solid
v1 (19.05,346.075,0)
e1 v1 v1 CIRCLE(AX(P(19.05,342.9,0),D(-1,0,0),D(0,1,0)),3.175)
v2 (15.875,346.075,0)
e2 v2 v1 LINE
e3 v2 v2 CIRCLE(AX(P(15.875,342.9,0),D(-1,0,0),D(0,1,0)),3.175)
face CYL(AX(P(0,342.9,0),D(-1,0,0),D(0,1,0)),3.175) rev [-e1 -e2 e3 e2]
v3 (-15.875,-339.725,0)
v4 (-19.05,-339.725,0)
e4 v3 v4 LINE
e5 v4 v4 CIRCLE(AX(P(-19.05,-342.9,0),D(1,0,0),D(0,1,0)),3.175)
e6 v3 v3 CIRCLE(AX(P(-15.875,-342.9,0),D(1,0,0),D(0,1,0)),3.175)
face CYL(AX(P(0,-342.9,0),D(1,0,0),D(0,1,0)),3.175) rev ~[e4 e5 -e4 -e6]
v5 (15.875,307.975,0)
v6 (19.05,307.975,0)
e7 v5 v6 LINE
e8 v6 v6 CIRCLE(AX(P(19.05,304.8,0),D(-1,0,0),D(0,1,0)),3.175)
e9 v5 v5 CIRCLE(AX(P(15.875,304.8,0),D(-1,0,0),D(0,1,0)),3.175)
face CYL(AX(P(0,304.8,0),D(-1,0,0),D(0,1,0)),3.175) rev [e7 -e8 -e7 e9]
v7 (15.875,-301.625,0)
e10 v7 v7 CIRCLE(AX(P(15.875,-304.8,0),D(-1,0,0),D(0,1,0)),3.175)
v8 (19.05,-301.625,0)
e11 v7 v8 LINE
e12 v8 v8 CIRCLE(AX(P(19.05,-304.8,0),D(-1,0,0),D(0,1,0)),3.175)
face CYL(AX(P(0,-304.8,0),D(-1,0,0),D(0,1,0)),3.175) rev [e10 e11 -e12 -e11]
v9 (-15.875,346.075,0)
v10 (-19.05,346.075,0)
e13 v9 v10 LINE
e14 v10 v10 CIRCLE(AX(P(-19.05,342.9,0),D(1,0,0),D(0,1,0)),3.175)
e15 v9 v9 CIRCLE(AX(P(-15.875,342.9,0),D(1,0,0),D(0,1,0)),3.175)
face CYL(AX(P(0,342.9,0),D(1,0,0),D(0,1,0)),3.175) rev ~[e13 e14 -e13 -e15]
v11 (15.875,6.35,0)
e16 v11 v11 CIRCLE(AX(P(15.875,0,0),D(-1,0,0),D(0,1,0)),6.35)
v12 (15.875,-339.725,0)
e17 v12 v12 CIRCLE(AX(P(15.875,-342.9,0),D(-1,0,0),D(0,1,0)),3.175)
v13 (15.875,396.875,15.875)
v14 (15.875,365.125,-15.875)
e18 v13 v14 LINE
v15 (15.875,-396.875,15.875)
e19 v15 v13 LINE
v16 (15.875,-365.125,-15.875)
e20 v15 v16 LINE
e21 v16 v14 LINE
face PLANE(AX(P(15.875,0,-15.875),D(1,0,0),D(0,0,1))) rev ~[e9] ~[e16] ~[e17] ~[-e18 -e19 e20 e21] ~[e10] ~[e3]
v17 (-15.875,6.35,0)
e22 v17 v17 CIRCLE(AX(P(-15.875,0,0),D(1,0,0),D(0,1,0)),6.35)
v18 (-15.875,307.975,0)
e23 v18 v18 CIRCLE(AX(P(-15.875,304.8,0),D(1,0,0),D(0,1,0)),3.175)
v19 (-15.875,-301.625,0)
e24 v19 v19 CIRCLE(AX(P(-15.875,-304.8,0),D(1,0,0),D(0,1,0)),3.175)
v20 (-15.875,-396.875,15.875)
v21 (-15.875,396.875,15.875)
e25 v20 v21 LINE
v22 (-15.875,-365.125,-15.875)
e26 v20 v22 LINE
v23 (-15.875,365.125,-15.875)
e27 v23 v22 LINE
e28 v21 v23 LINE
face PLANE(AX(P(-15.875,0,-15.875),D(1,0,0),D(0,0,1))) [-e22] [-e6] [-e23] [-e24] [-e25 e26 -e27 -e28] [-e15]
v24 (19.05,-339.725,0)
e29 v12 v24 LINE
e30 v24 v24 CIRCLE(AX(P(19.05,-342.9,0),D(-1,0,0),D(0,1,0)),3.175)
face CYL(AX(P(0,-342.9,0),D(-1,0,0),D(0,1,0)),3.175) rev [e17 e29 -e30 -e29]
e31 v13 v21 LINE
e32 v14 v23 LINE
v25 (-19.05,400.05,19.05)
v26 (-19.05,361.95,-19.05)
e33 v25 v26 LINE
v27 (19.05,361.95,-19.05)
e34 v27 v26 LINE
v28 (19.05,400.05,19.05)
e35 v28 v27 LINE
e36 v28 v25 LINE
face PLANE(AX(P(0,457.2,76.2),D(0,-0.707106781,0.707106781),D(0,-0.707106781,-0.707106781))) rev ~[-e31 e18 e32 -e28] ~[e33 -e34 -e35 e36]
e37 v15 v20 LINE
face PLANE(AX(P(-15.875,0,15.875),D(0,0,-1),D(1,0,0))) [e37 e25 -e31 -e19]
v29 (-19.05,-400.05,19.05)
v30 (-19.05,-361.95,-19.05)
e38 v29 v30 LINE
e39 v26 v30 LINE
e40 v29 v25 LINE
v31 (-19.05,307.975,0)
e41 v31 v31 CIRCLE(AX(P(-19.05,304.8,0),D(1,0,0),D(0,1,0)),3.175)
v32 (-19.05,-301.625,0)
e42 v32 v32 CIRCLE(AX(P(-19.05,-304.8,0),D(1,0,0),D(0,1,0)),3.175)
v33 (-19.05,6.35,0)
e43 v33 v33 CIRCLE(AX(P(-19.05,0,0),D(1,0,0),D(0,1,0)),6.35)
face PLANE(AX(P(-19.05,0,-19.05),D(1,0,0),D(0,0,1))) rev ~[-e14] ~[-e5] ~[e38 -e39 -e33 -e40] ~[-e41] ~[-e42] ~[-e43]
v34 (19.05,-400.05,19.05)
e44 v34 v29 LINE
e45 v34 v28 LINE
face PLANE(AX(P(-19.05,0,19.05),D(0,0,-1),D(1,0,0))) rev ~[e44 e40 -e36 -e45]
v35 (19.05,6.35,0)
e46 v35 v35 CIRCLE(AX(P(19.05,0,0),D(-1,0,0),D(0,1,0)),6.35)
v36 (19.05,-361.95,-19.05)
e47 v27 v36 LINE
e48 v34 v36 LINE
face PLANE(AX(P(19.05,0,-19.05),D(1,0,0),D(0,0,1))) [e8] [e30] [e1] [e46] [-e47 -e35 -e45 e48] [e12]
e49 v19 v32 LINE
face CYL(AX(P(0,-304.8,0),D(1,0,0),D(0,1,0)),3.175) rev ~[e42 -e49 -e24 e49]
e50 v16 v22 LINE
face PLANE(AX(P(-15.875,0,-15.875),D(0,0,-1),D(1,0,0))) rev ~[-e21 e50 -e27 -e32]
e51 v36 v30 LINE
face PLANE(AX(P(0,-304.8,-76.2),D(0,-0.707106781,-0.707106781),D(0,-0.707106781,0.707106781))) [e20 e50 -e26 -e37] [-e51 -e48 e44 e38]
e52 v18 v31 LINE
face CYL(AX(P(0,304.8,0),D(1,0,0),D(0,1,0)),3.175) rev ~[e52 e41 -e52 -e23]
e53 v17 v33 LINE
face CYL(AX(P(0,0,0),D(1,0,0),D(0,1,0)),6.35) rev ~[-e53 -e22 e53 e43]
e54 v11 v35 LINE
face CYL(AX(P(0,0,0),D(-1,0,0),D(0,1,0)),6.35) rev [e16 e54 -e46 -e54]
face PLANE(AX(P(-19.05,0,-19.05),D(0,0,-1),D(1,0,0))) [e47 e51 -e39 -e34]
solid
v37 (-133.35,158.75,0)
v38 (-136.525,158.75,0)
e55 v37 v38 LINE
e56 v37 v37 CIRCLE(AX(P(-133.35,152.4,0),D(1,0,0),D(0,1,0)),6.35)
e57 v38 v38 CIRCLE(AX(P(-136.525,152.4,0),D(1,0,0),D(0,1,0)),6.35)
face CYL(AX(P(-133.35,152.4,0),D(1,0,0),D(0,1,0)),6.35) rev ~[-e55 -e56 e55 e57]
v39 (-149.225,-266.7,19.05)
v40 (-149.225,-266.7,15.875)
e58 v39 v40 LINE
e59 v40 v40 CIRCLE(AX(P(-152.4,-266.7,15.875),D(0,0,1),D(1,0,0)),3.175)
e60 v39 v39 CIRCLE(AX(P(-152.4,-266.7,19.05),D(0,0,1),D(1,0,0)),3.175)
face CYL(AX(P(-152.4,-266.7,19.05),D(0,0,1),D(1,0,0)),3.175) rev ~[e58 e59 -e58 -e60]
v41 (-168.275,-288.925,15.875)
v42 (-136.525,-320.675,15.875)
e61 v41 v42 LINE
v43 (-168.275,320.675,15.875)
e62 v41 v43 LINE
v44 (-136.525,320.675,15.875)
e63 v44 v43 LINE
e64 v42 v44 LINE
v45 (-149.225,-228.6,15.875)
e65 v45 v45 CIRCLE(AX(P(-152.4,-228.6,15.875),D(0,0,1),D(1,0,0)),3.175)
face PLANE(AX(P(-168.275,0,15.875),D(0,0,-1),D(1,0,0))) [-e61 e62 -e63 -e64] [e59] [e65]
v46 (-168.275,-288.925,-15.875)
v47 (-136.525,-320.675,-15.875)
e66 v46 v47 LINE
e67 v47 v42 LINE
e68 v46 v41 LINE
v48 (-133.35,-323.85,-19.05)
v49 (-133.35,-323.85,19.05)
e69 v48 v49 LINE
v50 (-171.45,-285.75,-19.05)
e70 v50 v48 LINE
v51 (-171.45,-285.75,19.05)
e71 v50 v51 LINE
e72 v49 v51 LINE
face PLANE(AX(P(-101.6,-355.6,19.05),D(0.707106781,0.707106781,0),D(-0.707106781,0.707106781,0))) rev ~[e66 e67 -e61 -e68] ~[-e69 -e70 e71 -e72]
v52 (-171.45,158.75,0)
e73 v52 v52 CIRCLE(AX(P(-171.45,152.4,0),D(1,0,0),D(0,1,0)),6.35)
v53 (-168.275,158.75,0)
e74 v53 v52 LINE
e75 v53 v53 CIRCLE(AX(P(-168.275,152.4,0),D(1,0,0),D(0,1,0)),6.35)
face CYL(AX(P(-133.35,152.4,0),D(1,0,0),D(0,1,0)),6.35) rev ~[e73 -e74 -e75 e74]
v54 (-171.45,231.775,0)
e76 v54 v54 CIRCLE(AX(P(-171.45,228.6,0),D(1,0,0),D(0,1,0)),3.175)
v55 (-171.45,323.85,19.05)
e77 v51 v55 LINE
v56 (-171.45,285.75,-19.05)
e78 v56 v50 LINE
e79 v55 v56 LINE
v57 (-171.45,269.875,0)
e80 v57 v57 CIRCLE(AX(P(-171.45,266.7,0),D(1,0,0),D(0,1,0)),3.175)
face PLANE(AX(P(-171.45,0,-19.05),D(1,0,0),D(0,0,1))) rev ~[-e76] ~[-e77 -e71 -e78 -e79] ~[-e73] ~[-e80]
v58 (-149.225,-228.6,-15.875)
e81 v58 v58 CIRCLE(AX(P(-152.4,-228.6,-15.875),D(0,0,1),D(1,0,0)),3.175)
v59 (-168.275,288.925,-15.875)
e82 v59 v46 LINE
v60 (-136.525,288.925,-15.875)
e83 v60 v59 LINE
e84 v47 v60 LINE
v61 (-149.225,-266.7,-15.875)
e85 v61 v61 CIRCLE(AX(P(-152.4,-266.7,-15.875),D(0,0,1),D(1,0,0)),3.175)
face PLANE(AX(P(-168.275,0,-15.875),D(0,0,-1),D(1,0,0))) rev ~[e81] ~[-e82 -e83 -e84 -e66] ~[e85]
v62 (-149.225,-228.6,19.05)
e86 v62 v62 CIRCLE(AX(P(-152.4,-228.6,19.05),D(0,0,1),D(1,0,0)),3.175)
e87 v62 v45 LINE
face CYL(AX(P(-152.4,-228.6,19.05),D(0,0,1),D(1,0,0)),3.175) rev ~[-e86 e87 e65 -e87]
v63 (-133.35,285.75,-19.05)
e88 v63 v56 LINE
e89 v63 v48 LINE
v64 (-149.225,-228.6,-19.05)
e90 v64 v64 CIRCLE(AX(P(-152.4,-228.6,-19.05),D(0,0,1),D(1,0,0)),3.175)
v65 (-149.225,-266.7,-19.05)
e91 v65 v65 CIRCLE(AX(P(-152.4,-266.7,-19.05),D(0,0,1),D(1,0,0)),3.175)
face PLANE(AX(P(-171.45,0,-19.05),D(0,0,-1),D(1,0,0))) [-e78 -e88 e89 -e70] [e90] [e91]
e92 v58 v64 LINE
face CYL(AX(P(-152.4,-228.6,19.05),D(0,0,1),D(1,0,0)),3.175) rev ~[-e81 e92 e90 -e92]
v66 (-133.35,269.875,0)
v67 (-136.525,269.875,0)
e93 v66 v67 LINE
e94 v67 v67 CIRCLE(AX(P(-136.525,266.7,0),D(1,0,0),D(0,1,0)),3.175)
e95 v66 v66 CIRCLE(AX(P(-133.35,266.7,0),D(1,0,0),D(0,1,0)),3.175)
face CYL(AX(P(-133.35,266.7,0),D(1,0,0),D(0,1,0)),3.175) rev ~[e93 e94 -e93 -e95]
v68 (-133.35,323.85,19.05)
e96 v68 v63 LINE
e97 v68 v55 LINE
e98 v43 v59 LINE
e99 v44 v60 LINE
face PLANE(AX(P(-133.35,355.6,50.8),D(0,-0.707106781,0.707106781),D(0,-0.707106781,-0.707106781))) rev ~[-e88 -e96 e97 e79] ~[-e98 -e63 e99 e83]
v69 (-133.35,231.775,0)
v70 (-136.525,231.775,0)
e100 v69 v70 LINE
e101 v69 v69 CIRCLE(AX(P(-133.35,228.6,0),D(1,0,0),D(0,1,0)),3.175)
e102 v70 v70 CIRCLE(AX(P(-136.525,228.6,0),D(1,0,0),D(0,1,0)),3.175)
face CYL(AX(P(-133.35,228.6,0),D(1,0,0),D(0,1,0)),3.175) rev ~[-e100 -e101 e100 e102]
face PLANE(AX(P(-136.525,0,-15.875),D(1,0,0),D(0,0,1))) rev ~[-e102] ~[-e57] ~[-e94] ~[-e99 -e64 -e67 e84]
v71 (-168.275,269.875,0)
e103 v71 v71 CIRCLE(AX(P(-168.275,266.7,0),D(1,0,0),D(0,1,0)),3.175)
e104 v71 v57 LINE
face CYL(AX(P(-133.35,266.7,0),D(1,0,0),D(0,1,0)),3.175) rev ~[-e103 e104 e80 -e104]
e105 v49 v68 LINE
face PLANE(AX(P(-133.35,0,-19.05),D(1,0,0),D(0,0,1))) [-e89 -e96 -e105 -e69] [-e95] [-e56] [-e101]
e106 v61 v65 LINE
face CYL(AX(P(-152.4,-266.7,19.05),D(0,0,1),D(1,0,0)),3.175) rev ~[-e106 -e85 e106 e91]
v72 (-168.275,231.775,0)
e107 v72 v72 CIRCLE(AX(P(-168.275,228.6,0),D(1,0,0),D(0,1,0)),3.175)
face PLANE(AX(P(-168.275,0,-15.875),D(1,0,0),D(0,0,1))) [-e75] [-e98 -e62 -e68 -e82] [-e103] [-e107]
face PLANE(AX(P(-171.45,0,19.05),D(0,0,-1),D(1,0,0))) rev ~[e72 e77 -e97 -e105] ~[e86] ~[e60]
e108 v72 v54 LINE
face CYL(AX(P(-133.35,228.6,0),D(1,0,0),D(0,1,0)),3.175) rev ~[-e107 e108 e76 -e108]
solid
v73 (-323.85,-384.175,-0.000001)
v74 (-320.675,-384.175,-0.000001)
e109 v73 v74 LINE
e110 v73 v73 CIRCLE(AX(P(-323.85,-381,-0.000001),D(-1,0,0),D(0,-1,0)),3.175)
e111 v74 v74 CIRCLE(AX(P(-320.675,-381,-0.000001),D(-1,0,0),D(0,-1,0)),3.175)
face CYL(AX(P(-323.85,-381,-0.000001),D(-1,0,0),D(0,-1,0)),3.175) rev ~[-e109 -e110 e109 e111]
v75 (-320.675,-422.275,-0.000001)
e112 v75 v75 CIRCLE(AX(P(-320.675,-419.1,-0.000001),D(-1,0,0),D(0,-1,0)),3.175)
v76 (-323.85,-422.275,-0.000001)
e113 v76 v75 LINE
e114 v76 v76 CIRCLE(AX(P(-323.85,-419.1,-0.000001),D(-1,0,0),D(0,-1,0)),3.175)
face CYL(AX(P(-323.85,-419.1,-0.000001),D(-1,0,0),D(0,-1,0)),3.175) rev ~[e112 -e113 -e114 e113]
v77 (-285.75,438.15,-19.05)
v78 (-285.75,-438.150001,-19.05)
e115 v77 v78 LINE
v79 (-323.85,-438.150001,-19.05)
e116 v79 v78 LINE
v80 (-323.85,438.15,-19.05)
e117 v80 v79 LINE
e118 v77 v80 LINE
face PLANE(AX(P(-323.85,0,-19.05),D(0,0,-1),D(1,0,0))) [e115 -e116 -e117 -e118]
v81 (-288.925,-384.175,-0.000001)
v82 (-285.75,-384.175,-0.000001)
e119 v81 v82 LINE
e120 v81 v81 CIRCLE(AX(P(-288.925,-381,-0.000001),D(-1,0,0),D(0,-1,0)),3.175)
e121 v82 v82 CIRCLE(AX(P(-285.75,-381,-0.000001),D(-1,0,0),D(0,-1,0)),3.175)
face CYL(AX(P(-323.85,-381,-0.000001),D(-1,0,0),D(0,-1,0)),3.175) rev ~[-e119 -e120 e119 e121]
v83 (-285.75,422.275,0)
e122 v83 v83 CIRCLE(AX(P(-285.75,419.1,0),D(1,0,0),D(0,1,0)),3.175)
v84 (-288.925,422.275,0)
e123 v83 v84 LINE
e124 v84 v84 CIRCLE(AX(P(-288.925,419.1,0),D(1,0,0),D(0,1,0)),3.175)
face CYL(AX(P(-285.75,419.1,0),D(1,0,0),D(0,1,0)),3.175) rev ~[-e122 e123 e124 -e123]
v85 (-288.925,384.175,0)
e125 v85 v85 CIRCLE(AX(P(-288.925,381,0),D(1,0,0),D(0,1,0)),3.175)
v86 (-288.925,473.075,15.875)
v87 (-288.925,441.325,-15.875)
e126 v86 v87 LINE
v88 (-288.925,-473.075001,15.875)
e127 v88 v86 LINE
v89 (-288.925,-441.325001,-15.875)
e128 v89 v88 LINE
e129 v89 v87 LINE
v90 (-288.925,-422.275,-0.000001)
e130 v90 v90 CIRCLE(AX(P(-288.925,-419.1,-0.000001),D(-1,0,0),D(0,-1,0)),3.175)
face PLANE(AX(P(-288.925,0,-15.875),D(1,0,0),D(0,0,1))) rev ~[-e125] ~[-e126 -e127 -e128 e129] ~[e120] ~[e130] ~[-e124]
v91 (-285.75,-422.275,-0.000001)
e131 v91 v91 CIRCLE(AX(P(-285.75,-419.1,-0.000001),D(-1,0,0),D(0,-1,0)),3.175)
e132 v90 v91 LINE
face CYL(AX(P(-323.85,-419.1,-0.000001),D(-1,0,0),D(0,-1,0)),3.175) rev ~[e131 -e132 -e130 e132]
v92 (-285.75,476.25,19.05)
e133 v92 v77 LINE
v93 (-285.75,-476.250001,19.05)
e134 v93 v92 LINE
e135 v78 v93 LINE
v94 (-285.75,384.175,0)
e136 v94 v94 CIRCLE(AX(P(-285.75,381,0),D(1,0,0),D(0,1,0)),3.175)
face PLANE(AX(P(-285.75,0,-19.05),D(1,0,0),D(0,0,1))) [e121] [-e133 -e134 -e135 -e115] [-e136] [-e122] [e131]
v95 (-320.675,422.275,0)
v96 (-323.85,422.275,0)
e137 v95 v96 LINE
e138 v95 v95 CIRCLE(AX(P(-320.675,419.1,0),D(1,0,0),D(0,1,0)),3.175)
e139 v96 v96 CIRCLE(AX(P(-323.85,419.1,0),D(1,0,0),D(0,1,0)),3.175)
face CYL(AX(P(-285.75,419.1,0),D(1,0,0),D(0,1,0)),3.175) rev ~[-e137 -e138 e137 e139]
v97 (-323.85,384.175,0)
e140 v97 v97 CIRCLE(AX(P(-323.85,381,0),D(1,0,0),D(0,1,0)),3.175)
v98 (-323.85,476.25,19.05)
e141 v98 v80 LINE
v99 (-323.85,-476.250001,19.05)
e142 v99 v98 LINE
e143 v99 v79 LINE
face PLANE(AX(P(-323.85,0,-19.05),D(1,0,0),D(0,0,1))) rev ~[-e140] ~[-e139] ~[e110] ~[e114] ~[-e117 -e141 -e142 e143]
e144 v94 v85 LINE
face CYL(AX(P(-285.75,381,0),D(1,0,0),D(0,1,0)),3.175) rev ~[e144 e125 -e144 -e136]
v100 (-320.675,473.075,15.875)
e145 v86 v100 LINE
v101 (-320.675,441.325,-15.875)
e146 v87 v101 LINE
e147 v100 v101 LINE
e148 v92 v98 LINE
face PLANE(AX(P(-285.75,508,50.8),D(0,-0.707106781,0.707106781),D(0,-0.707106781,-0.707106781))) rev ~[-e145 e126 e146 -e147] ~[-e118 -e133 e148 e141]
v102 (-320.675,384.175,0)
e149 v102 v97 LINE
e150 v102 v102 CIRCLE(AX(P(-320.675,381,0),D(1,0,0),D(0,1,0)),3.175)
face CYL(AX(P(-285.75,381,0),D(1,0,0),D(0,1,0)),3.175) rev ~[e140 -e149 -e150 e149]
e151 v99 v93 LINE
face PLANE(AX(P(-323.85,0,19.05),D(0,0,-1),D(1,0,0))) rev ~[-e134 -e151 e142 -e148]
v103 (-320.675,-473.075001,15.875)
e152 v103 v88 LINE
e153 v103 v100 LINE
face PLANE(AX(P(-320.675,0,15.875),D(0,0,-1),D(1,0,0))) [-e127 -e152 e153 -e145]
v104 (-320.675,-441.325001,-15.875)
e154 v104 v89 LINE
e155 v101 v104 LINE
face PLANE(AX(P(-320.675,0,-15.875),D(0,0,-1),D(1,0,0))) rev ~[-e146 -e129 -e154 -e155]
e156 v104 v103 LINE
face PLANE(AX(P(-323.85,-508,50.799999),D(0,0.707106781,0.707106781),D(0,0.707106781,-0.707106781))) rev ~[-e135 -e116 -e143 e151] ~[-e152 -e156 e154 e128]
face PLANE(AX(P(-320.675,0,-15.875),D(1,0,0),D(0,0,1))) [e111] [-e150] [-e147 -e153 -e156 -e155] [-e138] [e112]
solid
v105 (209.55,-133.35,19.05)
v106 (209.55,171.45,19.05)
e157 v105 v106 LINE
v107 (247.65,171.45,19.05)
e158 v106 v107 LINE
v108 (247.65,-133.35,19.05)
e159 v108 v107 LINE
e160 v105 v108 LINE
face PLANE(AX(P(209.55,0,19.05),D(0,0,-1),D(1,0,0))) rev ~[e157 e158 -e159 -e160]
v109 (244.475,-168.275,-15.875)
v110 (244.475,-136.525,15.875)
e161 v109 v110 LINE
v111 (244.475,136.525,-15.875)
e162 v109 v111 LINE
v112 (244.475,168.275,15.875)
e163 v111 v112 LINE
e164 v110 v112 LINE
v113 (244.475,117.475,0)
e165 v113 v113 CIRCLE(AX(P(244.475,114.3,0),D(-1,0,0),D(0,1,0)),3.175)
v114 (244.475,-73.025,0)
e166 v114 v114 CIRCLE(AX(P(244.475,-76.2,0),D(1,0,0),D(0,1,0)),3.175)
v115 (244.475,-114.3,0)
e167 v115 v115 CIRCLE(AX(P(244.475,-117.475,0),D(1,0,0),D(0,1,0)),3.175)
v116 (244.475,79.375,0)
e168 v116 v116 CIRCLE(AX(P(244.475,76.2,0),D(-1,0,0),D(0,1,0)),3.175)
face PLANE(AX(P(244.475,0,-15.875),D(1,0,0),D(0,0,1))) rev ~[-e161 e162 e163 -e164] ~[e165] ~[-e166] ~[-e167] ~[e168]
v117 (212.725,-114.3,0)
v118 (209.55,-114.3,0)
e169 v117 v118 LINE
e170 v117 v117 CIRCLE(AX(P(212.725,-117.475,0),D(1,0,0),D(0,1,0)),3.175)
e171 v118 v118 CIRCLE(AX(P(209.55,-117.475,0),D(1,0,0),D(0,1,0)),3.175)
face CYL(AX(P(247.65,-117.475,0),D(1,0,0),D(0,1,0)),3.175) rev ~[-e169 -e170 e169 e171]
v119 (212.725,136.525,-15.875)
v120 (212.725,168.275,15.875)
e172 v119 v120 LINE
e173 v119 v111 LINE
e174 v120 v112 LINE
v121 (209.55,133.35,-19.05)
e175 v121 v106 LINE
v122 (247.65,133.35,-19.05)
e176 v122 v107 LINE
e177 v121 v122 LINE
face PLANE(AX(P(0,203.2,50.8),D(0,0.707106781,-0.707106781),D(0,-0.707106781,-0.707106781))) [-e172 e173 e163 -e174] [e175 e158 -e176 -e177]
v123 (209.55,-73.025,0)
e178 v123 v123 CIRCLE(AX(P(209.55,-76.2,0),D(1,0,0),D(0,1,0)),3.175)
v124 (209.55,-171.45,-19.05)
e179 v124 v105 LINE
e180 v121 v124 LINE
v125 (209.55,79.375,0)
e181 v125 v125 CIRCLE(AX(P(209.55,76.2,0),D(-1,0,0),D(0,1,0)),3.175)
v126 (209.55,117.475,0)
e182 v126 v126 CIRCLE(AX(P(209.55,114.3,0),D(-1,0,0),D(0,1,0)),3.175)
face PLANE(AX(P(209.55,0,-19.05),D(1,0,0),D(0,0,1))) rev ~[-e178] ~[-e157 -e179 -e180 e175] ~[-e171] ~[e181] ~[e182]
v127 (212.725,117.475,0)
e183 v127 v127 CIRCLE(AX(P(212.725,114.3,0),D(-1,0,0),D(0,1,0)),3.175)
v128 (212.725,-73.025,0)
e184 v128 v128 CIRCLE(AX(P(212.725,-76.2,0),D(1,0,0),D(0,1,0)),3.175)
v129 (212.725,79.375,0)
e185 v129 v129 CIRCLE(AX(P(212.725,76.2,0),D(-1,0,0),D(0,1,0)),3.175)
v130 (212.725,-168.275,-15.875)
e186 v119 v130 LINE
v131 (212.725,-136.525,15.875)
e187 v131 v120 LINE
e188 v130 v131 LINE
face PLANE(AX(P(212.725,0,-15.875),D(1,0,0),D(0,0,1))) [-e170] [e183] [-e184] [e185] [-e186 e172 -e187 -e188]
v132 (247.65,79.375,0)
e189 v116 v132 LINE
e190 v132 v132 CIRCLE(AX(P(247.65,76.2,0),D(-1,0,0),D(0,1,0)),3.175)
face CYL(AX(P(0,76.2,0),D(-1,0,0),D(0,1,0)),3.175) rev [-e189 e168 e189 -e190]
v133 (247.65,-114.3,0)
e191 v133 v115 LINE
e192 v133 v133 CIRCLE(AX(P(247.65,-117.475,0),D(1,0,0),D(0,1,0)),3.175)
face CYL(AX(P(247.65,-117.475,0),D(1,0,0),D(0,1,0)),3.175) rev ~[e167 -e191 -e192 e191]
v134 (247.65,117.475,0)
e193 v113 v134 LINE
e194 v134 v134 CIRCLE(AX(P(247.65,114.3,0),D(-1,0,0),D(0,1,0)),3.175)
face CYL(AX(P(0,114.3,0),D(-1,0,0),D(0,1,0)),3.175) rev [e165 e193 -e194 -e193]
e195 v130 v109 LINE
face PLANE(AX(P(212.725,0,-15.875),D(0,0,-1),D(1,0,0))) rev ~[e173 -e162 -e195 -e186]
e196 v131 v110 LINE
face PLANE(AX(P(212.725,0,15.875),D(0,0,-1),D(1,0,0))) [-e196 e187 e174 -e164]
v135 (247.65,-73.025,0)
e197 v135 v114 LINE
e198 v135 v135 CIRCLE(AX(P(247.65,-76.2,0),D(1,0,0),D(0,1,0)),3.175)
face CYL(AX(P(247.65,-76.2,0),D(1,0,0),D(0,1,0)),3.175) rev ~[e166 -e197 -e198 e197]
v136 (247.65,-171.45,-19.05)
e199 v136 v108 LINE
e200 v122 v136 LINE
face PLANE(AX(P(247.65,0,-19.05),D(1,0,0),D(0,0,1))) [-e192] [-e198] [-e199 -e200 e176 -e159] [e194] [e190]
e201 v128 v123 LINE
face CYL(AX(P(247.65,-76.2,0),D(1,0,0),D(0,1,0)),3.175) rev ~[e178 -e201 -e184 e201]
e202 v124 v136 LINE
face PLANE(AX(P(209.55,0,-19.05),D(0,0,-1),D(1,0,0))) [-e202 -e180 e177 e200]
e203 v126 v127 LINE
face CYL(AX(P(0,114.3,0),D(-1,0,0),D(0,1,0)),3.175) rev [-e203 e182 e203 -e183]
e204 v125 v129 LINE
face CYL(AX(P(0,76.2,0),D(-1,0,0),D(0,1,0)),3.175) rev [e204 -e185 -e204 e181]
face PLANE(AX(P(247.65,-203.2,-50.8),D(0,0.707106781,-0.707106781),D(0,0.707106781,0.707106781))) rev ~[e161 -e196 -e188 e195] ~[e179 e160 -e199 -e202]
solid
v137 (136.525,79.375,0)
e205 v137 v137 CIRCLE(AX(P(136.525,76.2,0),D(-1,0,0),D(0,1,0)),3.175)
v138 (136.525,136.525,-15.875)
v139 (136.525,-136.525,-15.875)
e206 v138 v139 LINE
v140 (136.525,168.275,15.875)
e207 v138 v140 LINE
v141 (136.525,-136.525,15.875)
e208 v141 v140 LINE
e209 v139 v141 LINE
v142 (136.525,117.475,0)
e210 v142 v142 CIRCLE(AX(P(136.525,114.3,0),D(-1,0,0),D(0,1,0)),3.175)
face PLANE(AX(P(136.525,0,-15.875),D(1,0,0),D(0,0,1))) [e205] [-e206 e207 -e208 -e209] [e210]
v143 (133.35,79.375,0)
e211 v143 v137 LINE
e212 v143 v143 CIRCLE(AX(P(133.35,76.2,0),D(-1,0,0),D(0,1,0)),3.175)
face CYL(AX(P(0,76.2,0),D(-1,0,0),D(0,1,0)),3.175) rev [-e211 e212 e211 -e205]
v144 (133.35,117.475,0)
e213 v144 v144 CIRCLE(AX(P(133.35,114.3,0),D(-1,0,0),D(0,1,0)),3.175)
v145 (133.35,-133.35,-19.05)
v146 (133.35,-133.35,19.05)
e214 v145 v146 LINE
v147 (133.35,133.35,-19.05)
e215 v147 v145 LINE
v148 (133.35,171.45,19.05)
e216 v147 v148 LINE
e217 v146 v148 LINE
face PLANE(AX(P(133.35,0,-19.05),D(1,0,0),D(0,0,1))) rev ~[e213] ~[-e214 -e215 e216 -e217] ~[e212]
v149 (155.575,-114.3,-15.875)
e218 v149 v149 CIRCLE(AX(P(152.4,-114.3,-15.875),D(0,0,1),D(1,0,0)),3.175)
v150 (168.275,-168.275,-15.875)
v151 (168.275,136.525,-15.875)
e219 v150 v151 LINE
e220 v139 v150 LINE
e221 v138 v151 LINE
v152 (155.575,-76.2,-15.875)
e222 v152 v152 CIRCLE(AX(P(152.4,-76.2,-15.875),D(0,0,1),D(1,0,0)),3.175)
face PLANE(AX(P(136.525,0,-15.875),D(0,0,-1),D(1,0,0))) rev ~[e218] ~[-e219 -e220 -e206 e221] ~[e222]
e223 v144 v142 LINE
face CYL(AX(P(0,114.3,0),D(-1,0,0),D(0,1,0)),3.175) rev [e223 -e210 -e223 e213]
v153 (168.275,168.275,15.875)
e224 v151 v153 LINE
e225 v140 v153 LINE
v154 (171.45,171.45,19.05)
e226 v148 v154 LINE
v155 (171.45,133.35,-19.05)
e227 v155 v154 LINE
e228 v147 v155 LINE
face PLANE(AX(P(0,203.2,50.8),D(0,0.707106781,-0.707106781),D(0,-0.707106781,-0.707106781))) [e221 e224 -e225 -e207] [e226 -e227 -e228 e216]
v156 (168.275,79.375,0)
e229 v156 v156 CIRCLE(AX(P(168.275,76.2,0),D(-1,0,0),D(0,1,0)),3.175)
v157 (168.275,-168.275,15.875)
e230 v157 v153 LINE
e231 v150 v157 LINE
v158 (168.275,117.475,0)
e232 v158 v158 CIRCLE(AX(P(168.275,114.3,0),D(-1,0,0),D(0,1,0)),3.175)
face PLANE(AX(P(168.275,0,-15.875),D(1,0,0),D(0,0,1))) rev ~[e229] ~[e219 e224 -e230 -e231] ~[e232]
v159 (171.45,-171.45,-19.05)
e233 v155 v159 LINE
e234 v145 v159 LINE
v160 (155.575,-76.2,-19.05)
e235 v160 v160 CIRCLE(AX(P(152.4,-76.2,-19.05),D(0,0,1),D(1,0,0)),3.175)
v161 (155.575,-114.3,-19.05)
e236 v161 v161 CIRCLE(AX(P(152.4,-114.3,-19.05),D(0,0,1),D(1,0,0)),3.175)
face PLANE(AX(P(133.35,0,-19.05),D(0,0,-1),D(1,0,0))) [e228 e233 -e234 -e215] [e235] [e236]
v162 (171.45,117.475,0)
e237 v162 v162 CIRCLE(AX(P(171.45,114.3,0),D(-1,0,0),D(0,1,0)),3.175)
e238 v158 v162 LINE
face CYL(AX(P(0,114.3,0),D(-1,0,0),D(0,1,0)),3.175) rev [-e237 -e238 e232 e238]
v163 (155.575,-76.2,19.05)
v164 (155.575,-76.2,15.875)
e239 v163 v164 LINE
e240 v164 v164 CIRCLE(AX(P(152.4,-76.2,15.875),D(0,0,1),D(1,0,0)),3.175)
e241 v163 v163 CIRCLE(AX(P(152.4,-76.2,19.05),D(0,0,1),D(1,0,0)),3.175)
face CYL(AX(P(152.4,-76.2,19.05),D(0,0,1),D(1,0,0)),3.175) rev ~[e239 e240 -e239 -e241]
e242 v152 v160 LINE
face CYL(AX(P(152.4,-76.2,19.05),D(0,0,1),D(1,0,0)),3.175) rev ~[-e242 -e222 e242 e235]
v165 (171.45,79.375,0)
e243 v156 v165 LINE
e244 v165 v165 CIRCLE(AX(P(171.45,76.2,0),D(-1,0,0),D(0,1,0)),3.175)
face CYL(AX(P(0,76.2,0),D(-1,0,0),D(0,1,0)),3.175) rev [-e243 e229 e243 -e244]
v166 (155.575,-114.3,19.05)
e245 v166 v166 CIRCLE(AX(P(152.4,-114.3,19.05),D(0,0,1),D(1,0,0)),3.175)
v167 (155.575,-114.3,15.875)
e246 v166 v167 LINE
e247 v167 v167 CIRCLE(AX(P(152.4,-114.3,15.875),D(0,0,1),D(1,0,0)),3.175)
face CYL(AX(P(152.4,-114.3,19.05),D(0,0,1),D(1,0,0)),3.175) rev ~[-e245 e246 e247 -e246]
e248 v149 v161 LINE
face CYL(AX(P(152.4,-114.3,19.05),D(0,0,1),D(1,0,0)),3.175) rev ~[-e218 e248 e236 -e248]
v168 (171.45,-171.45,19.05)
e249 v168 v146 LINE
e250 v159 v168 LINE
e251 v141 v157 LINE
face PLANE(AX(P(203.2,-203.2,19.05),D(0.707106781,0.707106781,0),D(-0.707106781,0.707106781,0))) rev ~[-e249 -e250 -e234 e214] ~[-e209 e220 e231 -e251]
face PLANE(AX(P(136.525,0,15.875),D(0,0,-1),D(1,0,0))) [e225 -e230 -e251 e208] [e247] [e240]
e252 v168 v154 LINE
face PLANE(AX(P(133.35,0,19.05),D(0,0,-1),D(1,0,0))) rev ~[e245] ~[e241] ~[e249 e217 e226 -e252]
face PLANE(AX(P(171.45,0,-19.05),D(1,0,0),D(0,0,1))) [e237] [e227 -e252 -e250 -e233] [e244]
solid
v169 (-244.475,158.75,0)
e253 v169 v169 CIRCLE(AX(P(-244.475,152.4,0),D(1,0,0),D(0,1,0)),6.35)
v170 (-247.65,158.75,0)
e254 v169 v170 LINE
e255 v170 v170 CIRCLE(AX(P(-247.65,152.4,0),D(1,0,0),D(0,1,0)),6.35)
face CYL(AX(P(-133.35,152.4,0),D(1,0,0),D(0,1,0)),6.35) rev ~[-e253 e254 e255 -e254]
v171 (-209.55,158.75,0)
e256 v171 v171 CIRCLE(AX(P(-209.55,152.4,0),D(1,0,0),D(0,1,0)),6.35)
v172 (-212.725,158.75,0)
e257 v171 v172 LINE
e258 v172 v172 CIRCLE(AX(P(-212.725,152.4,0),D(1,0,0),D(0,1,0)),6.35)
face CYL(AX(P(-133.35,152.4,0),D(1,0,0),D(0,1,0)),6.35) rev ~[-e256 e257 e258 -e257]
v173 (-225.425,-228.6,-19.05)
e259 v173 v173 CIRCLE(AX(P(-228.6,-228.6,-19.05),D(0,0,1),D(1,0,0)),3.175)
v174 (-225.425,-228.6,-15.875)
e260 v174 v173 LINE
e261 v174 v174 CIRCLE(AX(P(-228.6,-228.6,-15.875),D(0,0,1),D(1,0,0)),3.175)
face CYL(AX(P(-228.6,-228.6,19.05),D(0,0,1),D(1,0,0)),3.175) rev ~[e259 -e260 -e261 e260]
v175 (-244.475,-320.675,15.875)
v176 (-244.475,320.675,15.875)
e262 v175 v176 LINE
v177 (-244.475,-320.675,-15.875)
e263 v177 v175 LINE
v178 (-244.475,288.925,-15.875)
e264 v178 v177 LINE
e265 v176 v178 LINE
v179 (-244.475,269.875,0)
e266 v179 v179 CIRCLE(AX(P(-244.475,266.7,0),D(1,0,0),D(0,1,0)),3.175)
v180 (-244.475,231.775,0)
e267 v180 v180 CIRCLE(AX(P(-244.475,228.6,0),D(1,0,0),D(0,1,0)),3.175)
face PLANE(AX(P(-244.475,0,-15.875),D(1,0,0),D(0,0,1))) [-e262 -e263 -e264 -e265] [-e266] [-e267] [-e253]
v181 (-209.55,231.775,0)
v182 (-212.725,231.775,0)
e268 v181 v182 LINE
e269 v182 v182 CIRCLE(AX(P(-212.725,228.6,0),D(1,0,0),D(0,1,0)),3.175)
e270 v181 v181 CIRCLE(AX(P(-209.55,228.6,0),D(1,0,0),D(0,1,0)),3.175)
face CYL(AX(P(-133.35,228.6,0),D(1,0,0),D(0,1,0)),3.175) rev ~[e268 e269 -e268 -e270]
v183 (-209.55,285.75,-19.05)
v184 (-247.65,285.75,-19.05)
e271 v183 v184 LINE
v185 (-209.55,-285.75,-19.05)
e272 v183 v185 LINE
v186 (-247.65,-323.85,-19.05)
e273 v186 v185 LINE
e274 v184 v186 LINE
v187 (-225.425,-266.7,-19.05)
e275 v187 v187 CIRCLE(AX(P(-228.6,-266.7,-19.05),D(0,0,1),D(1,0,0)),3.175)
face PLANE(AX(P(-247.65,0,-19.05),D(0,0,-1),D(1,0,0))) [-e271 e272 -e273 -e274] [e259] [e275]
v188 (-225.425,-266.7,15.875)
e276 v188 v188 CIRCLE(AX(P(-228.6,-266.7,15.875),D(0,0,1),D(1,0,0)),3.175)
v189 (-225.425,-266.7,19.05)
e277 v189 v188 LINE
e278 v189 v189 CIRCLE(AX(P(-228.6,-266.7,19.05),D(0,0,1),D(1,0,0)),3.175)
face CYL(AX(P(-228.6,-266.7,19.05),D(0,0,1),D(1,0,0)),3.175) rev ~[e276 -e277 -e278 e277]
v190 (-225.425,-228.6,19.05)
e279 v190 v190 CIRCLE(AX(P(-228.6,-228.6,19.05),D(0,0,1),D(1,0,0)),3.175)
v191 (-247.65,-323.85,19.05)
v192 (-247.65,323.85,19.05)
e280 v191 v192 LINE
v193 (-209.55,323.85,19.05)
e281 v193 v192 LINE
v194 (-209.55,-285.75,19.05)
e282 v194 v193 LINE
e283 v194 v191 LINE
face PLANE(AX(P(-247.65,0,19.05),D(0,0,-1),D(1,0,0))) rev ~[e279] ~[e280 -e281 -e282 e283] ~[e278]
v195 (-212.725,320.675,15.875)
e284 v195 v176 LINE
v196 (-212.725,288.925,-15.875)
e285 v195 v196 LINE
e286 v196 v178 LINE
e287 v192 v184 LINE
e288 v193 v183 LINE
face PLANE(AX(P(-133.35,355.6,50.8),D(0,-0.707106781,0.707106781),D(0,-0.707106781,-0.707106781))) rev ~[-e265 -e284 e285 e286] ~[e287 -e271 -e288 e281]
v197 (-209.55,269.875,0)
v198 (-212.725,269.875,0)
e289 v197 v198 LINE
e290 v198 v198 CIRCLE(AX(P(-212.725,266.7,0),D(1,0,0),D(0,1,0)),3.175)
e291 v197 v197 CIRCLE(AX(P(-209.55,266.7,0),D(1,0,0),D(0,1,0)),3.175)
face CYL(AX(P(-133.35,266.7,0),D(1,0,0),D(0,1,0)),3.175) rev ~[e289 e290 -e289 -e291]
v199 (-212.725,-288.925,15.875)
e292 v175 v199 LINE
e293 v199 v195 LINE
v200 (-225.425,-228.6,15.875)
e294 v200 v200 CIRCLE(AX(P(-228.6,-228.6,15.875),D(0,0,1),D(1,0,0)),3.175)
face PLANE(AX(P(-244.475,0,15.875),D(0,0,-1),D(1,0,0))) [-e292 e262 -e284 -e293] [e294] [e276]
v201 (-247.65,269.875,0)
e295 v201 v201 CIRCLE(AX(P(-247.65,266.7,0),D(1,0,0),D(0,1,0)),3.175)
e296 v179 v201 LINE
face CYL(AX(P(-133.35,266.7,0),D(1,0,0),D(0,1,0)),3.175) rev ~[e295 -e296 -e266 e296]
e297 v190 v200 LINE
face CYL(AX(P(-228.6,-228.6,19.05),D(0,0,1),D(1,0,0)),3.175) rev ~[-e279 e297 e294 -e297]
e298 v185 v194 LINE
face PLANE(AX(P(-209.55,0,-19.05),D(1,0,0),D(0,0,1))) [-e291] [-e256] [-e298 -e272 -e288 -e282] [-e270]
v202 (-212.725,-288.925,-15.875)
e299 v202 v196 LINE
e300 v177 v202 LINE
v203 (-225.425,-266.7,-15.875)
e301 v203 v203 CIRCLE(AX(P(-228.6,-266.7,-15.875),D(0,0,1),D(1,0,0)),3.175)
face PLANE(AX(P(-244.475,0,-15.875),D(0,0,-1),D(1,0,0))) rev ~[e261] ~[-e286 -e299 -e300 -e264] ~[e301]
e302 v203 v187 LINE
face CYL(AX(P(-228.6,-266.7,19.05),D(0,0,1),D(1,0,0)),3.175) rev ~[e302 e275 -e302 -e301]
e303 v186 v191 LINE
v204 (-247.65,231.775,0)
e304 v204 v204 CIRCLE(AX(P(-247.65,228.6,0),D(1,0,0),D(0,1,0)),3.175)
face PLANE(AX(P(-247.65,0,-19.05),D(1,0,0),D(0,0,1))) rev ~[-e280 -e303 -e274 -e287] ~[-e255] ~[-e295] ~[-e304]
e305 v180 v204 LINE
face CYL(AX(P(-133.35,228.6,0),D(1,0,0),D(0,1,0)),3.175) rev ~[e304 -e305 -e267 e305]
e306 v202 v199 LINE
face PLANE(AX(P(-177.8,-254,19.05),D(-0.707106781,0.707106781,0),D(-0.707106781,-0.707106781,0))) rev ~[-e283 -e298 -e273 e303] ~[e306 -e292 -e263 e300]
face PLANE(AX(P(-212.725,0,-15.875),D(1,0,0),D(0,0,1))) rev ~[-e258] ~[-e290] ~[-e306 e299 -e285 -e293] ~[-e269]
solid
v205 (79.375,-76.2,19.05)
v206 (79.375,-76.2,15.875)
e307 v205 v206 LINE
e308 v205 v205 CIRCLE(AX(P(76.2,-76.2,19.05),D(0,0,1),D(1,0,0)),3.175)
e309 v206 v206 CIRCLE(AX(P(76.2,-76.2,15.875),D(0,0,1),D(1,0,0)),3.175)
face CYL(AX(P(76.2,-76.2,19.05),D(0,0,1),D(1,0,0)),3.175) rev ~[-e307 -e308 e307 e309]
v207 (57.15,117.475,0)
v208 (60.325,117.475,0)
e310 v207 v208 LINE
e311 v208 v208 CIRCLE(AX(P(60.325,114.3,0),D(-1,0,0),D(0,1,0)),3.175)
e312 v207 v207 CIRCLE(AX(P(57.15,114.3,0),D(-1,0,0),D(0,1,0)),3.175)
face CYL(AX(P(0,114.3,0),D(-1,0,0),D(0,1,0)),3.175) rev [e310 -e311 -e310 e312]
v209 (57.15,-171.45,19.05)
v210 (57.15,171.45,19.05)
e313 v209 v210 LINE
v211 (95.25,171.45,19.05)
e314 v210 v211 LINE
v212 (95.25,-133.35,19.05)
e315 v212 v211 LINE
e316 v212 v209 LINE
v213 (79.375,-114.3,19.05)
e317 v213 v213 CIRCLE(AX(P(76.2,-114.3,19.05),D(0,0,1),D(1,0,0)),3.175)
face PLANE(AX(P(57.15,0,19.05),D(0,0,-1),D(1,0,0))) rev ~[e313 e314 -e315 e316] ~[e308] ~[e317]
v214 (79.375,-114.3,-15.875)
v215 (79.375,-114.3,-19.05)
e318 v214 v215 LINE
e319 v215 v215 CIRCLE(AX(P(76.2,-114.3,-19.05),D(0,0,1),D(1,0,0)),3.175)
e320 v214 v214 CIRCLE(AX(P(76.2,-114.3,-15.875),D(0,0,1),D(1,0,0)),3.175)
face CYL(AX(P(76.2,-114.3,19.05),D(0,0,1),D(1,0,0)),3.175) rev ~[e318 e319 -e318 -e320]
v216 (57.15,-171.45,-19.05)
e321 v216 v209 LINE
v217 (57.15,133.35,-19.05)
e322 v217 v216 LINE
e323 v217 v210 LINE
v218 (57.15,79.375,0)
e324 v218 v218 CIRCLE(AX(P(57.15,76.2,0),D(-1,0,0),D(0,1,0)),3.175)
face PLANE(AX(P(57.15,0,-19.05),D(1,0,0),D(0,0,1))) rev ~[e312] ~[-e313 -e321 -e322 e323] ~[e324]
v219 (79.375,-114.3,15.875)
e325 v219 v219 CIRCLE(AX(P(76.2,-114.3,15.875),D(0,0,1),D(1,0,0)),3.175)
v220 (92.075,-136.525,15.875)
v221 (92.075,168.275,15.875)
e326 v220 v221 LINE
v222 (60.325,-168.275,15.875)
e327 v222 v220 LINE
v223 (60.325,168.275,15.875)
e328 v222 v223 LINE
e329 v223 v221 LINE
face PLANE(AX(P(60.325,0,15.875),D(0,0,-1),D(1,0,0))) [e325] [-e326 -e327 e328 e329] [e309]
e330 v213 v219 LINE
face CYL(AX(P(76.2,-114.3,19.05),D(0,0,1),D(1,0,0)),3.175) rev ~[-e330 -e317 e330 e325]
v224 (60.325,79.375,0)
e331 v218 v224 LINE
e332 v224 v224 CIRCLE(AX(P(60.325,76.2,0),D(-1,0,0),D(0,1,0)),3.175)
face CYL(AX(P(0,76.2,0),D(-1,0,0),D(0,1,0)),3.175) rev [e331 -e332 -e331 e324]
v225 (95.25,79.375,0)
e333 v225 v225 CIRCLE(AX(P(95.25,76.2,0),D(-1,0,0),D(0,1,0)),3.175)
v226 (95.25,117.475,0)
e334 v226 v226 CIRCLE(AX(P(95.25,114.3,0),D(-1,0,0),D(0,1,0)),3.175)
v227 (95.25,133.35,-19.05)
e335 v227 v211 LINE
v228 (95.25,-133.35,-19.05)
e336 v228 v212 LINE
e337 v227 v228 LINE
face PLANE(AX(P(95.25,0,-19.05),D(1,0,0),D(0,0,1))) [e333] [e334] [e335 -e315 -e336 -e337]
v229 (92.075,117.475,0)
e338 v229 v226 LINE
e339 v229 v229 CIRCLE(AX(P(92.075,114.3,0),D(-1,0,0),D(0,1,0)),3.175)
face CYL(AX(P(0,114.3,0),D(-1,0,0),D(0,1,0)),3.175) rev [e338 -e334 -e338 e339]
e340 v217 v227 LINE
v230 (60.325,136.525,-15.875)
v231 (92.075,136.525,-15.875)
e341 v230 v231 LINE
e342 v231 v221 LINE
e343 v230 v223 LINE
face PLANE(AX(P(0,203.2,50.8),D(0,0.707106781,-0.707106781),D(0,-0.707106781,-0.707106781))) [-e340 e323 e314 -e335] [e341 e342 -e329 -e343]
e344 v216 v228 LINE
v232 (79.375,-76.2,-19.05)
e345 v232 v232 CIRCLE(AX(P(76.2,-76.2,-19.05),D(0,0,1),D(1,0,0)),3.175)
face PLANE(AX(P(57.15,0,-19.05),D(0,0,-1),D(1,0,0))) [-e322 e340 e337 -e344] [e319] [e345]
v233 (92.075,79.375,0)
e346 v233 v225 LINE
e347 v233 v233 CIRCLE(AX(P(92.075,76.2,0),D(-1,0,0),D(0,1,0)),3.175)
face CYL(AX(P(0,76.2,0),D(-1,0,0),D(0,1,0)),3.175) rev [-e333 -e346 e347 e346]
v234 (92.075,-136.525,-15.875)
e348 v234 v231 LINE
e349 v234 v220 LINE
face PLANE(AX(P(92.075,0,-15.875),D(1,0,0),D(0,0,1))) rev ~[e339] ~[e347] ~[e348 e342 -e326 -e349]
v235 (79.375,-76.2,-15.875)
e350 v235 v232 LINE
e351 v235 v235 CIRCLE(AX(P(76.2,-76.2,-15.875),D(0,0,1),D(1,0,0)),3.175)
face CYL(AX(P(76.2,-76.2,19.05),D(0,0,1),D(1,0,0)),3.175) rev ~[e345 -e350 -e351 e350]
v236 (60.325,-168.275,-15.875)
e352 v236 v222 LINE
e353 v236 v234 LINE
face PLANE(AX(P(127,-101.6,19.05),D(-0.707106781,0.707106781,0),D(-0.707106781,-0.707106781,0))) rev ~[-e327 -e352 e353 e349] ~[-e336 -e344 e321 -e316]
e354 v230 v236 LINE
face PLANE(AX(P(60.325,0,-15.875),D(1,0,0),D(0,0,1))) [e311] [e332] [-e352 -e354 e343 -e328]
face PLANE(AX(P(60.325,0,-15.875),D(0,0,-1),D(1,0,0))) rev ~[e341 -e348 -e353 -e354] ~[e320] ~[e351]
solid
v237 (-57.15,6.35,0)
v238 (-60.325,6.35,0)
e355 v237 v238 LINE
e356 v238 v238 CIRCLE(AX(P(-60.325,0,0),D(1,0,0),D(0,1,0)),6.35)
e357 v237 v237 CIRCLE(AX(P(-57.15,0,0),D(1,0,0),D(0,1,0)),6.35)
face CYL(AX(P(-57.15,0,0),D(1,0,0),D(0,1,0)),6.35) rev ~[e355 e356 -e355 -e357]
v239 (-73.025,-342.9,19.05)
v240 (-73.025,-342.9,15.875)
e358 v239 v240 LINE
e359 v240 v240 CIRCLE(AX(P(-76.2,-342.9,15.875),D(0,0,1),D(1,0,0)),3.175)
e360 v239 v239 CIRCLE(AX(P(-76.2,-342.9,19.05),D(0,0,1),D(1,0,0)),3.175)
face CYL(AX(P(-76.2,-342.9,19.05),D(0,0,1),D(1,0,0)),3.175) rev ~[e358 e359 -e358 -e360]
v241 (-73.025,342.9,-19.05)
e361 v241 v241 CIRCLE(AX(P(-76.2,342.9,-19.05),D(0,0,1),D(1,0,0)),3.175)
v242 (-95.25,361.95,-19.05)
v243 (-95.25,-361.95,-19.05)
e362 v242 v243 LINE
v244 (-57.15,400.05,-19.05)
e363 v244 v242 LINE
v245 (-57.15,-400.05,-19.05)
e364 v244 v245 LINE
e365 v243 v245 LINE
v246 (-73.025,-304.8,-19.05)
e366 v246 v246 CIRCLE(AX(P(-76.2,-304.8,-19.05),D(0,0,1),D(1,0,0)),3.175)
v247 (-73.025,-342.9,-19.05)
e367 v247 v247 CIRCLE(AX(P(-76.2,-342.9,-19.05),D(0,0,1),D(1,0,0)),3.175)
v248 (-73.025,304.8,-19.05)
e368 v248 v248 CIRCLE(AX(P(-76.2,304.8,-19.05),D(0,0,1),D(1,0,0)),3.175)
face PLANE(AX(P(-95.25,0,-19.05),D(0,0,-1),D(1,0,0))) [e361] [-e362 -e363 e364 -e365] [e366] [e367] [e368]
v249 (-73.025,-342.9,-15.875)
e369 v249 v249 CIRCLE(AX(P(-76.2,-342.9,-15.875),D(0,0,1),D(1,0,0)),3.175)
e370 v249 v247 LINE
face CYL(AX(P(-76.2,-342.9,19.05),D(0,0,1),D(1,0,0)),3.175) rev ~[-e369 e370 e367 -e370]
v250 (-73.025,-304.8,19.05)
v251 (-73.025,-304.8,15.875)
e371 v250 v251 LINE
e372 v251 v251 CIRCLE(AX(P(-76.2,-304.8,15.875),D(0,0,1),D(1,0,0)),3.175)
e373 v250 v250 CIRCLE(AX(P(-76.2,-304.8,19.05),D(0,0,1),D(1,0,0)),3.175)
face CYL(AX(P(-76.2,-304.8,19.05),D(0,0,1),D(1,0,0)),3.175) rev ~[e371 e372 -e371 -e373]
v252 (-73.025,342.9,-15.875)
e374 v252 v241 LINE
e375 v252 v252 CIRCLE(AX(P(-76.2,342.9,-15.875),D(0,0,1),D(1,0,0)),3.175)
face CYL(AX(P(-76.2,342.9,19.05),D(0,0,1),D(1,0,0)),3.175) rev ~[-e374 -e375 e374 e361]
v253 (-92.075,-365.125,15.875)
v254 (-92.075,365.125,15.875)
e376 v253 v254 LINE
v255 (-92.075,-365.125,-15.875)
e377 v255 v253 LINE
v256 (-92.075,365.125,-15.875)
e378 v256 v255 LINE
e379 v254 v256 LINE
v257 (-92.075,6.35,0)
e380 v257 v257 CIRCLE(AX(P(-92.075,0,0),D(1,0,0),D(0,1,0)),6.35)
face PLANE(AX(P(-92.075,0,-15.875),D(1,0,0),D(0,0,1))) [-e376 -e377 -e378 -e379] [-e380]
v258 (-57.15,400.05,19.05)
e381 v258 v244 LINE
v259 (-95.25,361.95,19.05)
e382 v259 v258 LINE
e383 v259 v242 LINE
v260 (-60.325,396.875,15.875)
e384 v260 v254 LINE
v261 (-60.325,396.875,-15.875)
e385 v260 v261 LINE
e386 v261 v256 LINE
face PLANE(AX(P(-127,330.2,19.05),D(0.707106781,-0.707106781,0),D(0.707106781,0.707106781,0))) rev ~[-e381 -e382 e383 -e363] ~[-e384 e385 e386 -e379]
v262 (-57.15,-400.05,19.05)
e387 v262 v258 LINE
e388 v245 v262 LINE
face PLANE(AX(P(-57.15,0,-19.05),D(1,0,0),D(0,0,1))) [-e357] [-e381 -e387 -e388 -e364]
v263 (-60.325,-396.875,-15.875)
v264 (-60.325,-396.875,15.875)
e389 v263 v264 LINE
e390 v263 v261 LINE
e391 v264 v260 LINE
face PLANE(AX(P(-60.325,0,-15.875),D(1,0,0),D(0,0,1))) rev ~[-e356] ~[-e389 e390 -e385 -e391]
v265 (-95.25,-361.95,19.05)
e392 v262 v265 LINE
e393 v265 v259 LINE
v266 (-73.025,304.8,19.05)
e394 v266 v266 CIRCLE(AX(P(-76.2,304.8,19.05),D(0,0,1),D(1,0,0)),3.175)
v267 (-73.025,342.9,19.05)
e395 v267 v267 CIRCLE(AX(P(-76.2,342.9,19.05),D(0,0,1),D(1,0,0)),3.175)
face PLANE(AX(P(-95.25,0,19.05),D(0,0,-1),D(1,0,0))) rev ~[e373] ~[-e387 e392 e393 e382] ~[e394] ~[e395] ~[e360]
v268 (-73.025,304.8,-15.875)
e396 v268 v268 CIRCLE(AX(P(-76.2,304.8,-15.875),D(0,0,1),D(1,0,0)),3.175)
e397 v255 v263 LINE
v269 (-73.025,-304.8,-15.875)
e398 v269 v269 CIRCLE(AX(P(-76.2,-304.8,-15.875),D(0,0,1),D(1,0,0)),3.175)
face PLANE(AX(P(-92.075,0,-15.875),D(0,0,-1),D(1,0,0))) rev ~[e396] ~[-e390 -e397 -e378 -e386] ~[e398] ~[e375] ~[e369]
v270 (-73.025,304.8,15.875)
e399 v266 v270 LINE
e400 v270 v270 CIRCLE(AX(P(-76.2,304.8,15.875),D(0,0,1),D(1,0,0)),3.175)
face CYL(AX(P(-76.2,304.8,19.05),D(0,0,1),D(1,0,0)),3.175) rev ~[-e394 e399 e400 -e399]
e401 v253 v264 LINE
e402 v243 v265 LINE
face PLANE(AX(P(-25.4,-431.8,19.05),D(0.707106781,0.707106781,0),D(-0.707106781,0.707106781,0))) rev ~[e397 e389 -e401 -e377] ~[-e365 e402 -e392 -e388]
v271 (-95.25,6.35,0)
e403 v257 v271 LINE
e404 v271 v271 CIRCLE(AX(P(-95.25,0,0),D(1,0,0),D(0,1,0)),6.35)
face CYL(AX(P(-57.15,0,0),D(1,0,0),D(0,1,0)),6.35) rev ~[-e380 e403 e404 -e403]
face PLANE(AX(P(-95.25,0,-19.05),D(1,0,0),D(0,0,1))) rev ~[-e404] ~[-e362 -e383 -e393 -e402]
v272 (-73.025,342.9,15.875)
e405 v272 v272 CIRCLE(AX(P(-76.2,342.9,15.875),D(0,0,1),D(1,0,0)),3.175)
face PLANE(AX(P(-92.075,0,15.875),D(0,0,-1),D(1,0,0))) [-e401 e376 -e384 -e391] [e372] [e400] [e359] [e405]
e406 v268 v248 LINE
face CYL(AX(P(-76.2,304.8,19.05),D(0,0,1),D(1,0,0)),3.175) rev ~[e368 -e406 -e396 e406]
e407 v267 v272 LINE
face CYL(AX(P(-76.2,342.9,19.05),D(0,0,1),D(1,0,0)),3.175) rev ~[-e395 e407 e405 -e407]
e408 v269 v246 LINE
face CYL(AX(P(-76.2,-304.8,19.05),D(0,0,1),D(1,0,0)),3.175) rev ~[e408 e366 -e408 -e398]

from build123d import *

# Parameters (mm, degrees)
F0_W      = 38.1
F0_H      = 38.1
F0_W_2    = 31.75
F0_H_2    = 31.75
F1_DEPTH  = 457.2
F2_R      = 6.35
F2_R_2    = 3.175
F3_DEPTH  = 76.2
F4_W      = 38.1
F4_H      = 38.1
F4_W_2    = 31.75
F4_H_2    = 31.75
F5_DEPTH  = 457.2
F6_R      = 6.35
F7_DEPTH  = 38.101
F8_R      = 3.175
F9_DEPTH  = 38.101
F10_W     = 38.1
F10_H     = 38.1
F10_W_2   = 31.75
F10_H_2   = 31.75
F11_DEPTH = 228.6
F12_W     = 38.1
F12_H     = 38.1
F12_W_2   = 31.75
F12_H_2   = 31.75
F13_DEPTH = 228.6
F14_R     = 3.175
F15_DEPTH = 247.651
F16_R     = 3.175
F17_DEPTH = 38.101
F18_R     = 3.175
F19_DEPTH = 38.101
F20_R     = 3.175
F21_DEPTH = 342.901
F22_W     = 38.1
F22_H     = 38.1
F22_W_2   = 31.75
F22_H_2   = 31.75
F23_DEPTH = 355.6
F24_DEPTH = 508
F25_R     = 3.175
F25_R_2   = 6.35
F26_DEPTH = 190.501
F27_R     = 3.175
F28_DEPTH = 38.101
F29_R     = 3.175
F30_DEPTH = 38.101
F31_R     = 3.175
F32_DEPTH = 38.101
F33_R     = 3.175
F34_DEPTH = 571.501


with BuildPart() as f1:
    # F0 (on Front) → F1 (new body, symmetric)
    with BuildSketch(Plane.XZ):
        Rectangle(F0_W, F0_H)
        Rectangle(F0_W_2, F0_H_2, mode=Mode.SUBTRACT)
    extrude(amount=F1_DEPTH, both=True)

    # F2 (on Right) → F3 (cut, symmetric)
    with BuildSketch(Plane.YZ):
        Circle(F2_R)
        Polygon((-304.8, -76.2), (-381, 0), (-457.2, 76.2), (-558.8, 76.2), (-558.8, -76.2), align=None)
        with Locations((-304.8, 0)):
            Circle(F2_R_2)
        with Locations((-342.9, 0)):
            Circle(F2_R_2)
        with Locations((342.9, 0)):
            Circle(F2_R_2)
        with Locations((304.8, 0)):
            Circle(F2_R_2)
        Polygon((304.8, -76.2), (558.8, -76.2), (558.8, 76.2), (457.2, 76.2), (381, 0), align=None)
    extrude(amount=F3_DEPTH, both=True, mode=Mode.SUBTRACT)


with BuildPart() as f5:
    # F4 (on Front) → F5 (new body, symmetric)
    with BuildSketch(Plane.XZ):
        with Locations((-76.2, 0)):
            Rectangle(F4_W, F4_H)
        with Locations((-76.2, 0)):
            Rectangle(F4_W_2, F4_H_2, mode=Mode.SUBTRACT)
    extrude(amount=F5_DEPTH, both=True)

    # F6 (on face) → F7 (cut, through all)
    with BuildSketch(Plane.YZ.offset(-57.15)):
        Circle(F6_R)
    extrude(amount=-F7_DEPTH, mode=Mode.SUBTRACT)

    # F8 (on face) → F9 (cut, through all)
    with BuildSketch(Plane.XY.offset(19.05)):
        Polygon((-127, 330.2), (-76.2, 381), (-25.4, 431.8), (-25.4, 533.4), (-127, 533.4), align=None)
        with Locations((-76.2, 342.9)):
            Circle(F8_R)
        with Locations((-76.2, 304.8)):
            Circle(F8_R)
        with Locations((-76.2, -304.8)):
            Circle(F8_R)
        with Locations((-76.2, -342.9)):
            Circle(F8_R)
        Polygon((-25.4, -431.8), (-76.2, -381), (-127, -330.2), (-127, -533.4), (-25.4, -533.4), align=None)
    extrude(amount=-F9_DEPTH, mode=Mode.SUBTRACT)


with BuildPart() as f11:
    # F10 (on Front) → F11 (new body, symmetric)
    with BuildSketch(Plane.XZ):
        with Locations((76.2, 0)):
            Rectangle(F10_W, F10_H)
        with Locations((76.2, 0)):
            Rectangle(F10_W_2, F10_H_2, mode=Mode.SUBTRACT)
    extrude(amount=F11_DEPTH, both=True)


with BuildPart() as f13:
    # F12 (on Front) → F13 (new body, symmetric)
    with BuildSketch(Plane.XZ):
        with Locations((152.4, 0)):
            Rectangle(F12_W, F12_H)
        with Locations((152.4, 0)):
            Rectangle(F12_W_2, F12_H_2, mode=Mode.SUBTRACT)
    extrude(amount=F13_DEPTH, both=True)


with BuildPart() as f13b:
    # F12 (on Front) → F13, piece 2 (new body, symmetric)
    with BuildSketch(Plane.XZ):
        with Locations((228.6, 0)):
            Rectangle(F12_W, F12_H)
        with Locations((228.6, 0)):
            Rectangle(F12_W_2, F12_H_2, mode=Mode.SUBTRACT)
    extrude(amount=F13_DEPTH, both=True)


with BuildPart() as f15_tool:
    # F14 (on Right) → F15 (new body, through all)
    with BuildSketch(Plane.YZ):
        Polygon((203.2, 50.8), (152.4, 0), (101.6, -50.8), (304.8, -50.8), (304.8, 50.8), align=None)
        with Locations((76.2, 0)):
            Circle(F14_R)
        with Locations((114.3, 0)):
            Circle(F14_R)
    extrude(amount=F15_DEPTH)


with BuildPart() as f11_1:
    add(f11.part)

    # F15: cut by f15_tool
    add(f15_tool.part, mode=Mode.SUBTRACT)

    # F16 (on face) → F17 (cut, through all)
    with BuildSketch(Plane.XY.offset(19.05)):
        Polygon((127, -101.6), (76.2, -152.4), (25.4, -203.2), (25.4, -304.8), (127, -304.8), align=None)
        with Locations((76.2, -76.2)):
            Circle(F16_R)
        with Locations((76.2, -114.3)):
            Circle(F16_R)
    extrude(amount=-F17_DEPTH, mode=Mode.SUBTRACT)


with BuildPart() as f13_1:
    add(f13.part)

    # F15: cut by f15_tool
    add(f15_tool.part, mode=Mode.SUBTRACT)

    # F18 (on face) → F19 (cut, through all)
    with BuildSketch(Plane.XY.offset(19.05)):
        Polygon((203.2, -203.2), (152.4, -152.4), (101.6, -101.6), (101.6, -304.8), (203.2, -304.8), align=None)
        with Locations((152.4, -76.2)):
            Circle(F18_R)
        with Locations((152.4, -114.3)):
            Circle(F18_R)
    extrude(amount=-F19_DEPTH, mode=Mode.SUBTRACT)


with BuildPart() as f13b_1:
    add(f13b.part)

    # F15: cut by f15_tool
    add(f15_tool.part, mode=Mode.SUBTRACT)

    # F20 (on face) → F21 (cut, through all)
    with BuildSketch(Plane.YZ.offset(247.65)):
        Polygon((-152.4, 0), (-101.6, 50.8), (-304.8, 50.8), (-304.8, -50.8), (-203.2, -50.8), align=None)
        with Locations((-117.475, 0)):
            Circle(F20_R)
        with Locations((-76.2, 0)):
            Circle(F20_R)
    extrude(amount=-F21_DEPTH, mode=Mode.SUBTRACT)


with BuildPart() as f23:
    # F22 (on Front) → F23 (new body, symmetric)
    with BuildSketch(Plane.XZ):
        with Locations((-152.4, 0)):
            Rectangle(F22_W, F22_H)
        with Locations((-152.4, 0)):
            Rectangle(F22_W_2, F22_H_2, mode=Mode.SUBTRACT)
    extrude(amount=F23_DEPTH, both=True)


with BuildPart() as f23b:
    # F22 (on Front) → F23, piece 2 (new body, symmetric)
    with BuildSketch(Plane.XZ):
        with Locations((-228.6, 0)):
            Rectangle(F22_W, F22_H)
        with Locations((-228.6, 0)):
            Rectangle(F22_W_2, F22_H_2, mode=Mode.SUBTRACT)
    extrude(amount=F23_DEPTH, both=True)


with BuildPart() as f24:
    # F22 (on Front) → F24 (new body, symmetric)
    with BuildSketch(Plane.XZ):
        with Locations((-304.8, 0)):
            Rectangle(F22_W, F22_H)
        with Locations((-304.8, 0)):
            Rectangle(F22_W_2, F22_H_2, mode=Mode.SUBTRACT)
    extrude(amount=F24_DEPTH, both=True)

    # F27 (on face) → F28 (cut, through all)
    with BuildSketch(Plane.YZ.offset(-285.75)):
        Polygon((508, 50.8), (457.2, 0), (406.4, -50.8), (609.6, -50.8), (609.6, 50.8), align=None)
        with Locations((381, 0)):
            Circle(F27_R)
        with Locations((419.1, 0)):
            Circle(F27_R)
    extrude(amount=-F28_DEPTH, mode=Mode.SUBTRACT)

    # F33 (on face) → F34 (cut, through all)
    with BuildSketch(Plane(origin=(-323.85, 0, 0), x_dir=(0, -1, 0), z_dir=(-1, 0, 0))):
        Polygon((508, 50.7999994945), (457.2, -5.055e-07), (406.4, -50.8000005055), (609.6, -50.8000005055), (609.6, 50.7999994945), align=None)
        with Locations((381, -5.055e-07)):
            Circle(F33_R)
        with Locations((419.1, -5.055e-07)):
            Circle(F33_R)
    extrude(amount=-F34_DEPTH, mode=Mode.SUBTRACT)


with BuildPart() as f26_tool:
    # F25 (on face) → F26 (new body, through all)
    with BuildSketch(Plane.YZ.offset(-133.35)):
        Polygon((355.6, 50.8), (304.8, 0), (254, -50.8), (457.2, -50.8), (457.2, 50.8), align=None)
        with Locations((228.6, 0)):
            Circle(F25_R)
        with Locations((266.7, 0)):
            Circle(F25_R)
        with Locations((152.4, 0)):
            Circle(F25_R_2)
    extrude(amount=-F26_DEPTH)


with BuildPart() as f23_1:
    add(f23.part)

    # F26: cut by f26_tool
    add(f26_tool.part, mode=Mode.SUBTRACT)

    # F29 (on face) → F30 (cut, through all)
    with BuildSketch(Plane.XY.offset(19.05)):
        Polygon((-101.6, -355.6), (-152.4, -304.8), (-203.2, -254), (-203.2, -457.2), (-101.6, -457.2), align=None)
        with Locations((-152.4, -228.6)):
            Circle(F29_R)
        with Locations((-152.4, -266.7)):
            Circle(F29_R)
    extrude(amount=-F30_DEPTH, mode=Mode.SUBTRACT)


with BuildPart() as f23b_1:
    add(f23b.part)

    # F26: cut by f26_tool
    add(f26_tool.part, mode=Mode.SUBTRACT)

    # F31 (on face) → F32 (cut, through all)
    with BuildSketch(Plane.XY.offset(19.05)):
        Polygon((-177.8, -254), (-228.6, -304.8), (-279.4, -355.6), (-279.4, -457.2), (-177.8, -457.2), align=None)
        with Locations((-228.6, -228.6)):
            Circle(F31_R)
        with Locations((-228.6, -266.7)):
            Circle(F31_R)
    extrude(amount=-F32_DEPTH, mode=Mode.SUBTRACT)


solid = Compound([f1.part, f5.part, f11_1.part, f13_1.part, f13b_1.part, f24.part, f23_1.part, f23b_1.part])
